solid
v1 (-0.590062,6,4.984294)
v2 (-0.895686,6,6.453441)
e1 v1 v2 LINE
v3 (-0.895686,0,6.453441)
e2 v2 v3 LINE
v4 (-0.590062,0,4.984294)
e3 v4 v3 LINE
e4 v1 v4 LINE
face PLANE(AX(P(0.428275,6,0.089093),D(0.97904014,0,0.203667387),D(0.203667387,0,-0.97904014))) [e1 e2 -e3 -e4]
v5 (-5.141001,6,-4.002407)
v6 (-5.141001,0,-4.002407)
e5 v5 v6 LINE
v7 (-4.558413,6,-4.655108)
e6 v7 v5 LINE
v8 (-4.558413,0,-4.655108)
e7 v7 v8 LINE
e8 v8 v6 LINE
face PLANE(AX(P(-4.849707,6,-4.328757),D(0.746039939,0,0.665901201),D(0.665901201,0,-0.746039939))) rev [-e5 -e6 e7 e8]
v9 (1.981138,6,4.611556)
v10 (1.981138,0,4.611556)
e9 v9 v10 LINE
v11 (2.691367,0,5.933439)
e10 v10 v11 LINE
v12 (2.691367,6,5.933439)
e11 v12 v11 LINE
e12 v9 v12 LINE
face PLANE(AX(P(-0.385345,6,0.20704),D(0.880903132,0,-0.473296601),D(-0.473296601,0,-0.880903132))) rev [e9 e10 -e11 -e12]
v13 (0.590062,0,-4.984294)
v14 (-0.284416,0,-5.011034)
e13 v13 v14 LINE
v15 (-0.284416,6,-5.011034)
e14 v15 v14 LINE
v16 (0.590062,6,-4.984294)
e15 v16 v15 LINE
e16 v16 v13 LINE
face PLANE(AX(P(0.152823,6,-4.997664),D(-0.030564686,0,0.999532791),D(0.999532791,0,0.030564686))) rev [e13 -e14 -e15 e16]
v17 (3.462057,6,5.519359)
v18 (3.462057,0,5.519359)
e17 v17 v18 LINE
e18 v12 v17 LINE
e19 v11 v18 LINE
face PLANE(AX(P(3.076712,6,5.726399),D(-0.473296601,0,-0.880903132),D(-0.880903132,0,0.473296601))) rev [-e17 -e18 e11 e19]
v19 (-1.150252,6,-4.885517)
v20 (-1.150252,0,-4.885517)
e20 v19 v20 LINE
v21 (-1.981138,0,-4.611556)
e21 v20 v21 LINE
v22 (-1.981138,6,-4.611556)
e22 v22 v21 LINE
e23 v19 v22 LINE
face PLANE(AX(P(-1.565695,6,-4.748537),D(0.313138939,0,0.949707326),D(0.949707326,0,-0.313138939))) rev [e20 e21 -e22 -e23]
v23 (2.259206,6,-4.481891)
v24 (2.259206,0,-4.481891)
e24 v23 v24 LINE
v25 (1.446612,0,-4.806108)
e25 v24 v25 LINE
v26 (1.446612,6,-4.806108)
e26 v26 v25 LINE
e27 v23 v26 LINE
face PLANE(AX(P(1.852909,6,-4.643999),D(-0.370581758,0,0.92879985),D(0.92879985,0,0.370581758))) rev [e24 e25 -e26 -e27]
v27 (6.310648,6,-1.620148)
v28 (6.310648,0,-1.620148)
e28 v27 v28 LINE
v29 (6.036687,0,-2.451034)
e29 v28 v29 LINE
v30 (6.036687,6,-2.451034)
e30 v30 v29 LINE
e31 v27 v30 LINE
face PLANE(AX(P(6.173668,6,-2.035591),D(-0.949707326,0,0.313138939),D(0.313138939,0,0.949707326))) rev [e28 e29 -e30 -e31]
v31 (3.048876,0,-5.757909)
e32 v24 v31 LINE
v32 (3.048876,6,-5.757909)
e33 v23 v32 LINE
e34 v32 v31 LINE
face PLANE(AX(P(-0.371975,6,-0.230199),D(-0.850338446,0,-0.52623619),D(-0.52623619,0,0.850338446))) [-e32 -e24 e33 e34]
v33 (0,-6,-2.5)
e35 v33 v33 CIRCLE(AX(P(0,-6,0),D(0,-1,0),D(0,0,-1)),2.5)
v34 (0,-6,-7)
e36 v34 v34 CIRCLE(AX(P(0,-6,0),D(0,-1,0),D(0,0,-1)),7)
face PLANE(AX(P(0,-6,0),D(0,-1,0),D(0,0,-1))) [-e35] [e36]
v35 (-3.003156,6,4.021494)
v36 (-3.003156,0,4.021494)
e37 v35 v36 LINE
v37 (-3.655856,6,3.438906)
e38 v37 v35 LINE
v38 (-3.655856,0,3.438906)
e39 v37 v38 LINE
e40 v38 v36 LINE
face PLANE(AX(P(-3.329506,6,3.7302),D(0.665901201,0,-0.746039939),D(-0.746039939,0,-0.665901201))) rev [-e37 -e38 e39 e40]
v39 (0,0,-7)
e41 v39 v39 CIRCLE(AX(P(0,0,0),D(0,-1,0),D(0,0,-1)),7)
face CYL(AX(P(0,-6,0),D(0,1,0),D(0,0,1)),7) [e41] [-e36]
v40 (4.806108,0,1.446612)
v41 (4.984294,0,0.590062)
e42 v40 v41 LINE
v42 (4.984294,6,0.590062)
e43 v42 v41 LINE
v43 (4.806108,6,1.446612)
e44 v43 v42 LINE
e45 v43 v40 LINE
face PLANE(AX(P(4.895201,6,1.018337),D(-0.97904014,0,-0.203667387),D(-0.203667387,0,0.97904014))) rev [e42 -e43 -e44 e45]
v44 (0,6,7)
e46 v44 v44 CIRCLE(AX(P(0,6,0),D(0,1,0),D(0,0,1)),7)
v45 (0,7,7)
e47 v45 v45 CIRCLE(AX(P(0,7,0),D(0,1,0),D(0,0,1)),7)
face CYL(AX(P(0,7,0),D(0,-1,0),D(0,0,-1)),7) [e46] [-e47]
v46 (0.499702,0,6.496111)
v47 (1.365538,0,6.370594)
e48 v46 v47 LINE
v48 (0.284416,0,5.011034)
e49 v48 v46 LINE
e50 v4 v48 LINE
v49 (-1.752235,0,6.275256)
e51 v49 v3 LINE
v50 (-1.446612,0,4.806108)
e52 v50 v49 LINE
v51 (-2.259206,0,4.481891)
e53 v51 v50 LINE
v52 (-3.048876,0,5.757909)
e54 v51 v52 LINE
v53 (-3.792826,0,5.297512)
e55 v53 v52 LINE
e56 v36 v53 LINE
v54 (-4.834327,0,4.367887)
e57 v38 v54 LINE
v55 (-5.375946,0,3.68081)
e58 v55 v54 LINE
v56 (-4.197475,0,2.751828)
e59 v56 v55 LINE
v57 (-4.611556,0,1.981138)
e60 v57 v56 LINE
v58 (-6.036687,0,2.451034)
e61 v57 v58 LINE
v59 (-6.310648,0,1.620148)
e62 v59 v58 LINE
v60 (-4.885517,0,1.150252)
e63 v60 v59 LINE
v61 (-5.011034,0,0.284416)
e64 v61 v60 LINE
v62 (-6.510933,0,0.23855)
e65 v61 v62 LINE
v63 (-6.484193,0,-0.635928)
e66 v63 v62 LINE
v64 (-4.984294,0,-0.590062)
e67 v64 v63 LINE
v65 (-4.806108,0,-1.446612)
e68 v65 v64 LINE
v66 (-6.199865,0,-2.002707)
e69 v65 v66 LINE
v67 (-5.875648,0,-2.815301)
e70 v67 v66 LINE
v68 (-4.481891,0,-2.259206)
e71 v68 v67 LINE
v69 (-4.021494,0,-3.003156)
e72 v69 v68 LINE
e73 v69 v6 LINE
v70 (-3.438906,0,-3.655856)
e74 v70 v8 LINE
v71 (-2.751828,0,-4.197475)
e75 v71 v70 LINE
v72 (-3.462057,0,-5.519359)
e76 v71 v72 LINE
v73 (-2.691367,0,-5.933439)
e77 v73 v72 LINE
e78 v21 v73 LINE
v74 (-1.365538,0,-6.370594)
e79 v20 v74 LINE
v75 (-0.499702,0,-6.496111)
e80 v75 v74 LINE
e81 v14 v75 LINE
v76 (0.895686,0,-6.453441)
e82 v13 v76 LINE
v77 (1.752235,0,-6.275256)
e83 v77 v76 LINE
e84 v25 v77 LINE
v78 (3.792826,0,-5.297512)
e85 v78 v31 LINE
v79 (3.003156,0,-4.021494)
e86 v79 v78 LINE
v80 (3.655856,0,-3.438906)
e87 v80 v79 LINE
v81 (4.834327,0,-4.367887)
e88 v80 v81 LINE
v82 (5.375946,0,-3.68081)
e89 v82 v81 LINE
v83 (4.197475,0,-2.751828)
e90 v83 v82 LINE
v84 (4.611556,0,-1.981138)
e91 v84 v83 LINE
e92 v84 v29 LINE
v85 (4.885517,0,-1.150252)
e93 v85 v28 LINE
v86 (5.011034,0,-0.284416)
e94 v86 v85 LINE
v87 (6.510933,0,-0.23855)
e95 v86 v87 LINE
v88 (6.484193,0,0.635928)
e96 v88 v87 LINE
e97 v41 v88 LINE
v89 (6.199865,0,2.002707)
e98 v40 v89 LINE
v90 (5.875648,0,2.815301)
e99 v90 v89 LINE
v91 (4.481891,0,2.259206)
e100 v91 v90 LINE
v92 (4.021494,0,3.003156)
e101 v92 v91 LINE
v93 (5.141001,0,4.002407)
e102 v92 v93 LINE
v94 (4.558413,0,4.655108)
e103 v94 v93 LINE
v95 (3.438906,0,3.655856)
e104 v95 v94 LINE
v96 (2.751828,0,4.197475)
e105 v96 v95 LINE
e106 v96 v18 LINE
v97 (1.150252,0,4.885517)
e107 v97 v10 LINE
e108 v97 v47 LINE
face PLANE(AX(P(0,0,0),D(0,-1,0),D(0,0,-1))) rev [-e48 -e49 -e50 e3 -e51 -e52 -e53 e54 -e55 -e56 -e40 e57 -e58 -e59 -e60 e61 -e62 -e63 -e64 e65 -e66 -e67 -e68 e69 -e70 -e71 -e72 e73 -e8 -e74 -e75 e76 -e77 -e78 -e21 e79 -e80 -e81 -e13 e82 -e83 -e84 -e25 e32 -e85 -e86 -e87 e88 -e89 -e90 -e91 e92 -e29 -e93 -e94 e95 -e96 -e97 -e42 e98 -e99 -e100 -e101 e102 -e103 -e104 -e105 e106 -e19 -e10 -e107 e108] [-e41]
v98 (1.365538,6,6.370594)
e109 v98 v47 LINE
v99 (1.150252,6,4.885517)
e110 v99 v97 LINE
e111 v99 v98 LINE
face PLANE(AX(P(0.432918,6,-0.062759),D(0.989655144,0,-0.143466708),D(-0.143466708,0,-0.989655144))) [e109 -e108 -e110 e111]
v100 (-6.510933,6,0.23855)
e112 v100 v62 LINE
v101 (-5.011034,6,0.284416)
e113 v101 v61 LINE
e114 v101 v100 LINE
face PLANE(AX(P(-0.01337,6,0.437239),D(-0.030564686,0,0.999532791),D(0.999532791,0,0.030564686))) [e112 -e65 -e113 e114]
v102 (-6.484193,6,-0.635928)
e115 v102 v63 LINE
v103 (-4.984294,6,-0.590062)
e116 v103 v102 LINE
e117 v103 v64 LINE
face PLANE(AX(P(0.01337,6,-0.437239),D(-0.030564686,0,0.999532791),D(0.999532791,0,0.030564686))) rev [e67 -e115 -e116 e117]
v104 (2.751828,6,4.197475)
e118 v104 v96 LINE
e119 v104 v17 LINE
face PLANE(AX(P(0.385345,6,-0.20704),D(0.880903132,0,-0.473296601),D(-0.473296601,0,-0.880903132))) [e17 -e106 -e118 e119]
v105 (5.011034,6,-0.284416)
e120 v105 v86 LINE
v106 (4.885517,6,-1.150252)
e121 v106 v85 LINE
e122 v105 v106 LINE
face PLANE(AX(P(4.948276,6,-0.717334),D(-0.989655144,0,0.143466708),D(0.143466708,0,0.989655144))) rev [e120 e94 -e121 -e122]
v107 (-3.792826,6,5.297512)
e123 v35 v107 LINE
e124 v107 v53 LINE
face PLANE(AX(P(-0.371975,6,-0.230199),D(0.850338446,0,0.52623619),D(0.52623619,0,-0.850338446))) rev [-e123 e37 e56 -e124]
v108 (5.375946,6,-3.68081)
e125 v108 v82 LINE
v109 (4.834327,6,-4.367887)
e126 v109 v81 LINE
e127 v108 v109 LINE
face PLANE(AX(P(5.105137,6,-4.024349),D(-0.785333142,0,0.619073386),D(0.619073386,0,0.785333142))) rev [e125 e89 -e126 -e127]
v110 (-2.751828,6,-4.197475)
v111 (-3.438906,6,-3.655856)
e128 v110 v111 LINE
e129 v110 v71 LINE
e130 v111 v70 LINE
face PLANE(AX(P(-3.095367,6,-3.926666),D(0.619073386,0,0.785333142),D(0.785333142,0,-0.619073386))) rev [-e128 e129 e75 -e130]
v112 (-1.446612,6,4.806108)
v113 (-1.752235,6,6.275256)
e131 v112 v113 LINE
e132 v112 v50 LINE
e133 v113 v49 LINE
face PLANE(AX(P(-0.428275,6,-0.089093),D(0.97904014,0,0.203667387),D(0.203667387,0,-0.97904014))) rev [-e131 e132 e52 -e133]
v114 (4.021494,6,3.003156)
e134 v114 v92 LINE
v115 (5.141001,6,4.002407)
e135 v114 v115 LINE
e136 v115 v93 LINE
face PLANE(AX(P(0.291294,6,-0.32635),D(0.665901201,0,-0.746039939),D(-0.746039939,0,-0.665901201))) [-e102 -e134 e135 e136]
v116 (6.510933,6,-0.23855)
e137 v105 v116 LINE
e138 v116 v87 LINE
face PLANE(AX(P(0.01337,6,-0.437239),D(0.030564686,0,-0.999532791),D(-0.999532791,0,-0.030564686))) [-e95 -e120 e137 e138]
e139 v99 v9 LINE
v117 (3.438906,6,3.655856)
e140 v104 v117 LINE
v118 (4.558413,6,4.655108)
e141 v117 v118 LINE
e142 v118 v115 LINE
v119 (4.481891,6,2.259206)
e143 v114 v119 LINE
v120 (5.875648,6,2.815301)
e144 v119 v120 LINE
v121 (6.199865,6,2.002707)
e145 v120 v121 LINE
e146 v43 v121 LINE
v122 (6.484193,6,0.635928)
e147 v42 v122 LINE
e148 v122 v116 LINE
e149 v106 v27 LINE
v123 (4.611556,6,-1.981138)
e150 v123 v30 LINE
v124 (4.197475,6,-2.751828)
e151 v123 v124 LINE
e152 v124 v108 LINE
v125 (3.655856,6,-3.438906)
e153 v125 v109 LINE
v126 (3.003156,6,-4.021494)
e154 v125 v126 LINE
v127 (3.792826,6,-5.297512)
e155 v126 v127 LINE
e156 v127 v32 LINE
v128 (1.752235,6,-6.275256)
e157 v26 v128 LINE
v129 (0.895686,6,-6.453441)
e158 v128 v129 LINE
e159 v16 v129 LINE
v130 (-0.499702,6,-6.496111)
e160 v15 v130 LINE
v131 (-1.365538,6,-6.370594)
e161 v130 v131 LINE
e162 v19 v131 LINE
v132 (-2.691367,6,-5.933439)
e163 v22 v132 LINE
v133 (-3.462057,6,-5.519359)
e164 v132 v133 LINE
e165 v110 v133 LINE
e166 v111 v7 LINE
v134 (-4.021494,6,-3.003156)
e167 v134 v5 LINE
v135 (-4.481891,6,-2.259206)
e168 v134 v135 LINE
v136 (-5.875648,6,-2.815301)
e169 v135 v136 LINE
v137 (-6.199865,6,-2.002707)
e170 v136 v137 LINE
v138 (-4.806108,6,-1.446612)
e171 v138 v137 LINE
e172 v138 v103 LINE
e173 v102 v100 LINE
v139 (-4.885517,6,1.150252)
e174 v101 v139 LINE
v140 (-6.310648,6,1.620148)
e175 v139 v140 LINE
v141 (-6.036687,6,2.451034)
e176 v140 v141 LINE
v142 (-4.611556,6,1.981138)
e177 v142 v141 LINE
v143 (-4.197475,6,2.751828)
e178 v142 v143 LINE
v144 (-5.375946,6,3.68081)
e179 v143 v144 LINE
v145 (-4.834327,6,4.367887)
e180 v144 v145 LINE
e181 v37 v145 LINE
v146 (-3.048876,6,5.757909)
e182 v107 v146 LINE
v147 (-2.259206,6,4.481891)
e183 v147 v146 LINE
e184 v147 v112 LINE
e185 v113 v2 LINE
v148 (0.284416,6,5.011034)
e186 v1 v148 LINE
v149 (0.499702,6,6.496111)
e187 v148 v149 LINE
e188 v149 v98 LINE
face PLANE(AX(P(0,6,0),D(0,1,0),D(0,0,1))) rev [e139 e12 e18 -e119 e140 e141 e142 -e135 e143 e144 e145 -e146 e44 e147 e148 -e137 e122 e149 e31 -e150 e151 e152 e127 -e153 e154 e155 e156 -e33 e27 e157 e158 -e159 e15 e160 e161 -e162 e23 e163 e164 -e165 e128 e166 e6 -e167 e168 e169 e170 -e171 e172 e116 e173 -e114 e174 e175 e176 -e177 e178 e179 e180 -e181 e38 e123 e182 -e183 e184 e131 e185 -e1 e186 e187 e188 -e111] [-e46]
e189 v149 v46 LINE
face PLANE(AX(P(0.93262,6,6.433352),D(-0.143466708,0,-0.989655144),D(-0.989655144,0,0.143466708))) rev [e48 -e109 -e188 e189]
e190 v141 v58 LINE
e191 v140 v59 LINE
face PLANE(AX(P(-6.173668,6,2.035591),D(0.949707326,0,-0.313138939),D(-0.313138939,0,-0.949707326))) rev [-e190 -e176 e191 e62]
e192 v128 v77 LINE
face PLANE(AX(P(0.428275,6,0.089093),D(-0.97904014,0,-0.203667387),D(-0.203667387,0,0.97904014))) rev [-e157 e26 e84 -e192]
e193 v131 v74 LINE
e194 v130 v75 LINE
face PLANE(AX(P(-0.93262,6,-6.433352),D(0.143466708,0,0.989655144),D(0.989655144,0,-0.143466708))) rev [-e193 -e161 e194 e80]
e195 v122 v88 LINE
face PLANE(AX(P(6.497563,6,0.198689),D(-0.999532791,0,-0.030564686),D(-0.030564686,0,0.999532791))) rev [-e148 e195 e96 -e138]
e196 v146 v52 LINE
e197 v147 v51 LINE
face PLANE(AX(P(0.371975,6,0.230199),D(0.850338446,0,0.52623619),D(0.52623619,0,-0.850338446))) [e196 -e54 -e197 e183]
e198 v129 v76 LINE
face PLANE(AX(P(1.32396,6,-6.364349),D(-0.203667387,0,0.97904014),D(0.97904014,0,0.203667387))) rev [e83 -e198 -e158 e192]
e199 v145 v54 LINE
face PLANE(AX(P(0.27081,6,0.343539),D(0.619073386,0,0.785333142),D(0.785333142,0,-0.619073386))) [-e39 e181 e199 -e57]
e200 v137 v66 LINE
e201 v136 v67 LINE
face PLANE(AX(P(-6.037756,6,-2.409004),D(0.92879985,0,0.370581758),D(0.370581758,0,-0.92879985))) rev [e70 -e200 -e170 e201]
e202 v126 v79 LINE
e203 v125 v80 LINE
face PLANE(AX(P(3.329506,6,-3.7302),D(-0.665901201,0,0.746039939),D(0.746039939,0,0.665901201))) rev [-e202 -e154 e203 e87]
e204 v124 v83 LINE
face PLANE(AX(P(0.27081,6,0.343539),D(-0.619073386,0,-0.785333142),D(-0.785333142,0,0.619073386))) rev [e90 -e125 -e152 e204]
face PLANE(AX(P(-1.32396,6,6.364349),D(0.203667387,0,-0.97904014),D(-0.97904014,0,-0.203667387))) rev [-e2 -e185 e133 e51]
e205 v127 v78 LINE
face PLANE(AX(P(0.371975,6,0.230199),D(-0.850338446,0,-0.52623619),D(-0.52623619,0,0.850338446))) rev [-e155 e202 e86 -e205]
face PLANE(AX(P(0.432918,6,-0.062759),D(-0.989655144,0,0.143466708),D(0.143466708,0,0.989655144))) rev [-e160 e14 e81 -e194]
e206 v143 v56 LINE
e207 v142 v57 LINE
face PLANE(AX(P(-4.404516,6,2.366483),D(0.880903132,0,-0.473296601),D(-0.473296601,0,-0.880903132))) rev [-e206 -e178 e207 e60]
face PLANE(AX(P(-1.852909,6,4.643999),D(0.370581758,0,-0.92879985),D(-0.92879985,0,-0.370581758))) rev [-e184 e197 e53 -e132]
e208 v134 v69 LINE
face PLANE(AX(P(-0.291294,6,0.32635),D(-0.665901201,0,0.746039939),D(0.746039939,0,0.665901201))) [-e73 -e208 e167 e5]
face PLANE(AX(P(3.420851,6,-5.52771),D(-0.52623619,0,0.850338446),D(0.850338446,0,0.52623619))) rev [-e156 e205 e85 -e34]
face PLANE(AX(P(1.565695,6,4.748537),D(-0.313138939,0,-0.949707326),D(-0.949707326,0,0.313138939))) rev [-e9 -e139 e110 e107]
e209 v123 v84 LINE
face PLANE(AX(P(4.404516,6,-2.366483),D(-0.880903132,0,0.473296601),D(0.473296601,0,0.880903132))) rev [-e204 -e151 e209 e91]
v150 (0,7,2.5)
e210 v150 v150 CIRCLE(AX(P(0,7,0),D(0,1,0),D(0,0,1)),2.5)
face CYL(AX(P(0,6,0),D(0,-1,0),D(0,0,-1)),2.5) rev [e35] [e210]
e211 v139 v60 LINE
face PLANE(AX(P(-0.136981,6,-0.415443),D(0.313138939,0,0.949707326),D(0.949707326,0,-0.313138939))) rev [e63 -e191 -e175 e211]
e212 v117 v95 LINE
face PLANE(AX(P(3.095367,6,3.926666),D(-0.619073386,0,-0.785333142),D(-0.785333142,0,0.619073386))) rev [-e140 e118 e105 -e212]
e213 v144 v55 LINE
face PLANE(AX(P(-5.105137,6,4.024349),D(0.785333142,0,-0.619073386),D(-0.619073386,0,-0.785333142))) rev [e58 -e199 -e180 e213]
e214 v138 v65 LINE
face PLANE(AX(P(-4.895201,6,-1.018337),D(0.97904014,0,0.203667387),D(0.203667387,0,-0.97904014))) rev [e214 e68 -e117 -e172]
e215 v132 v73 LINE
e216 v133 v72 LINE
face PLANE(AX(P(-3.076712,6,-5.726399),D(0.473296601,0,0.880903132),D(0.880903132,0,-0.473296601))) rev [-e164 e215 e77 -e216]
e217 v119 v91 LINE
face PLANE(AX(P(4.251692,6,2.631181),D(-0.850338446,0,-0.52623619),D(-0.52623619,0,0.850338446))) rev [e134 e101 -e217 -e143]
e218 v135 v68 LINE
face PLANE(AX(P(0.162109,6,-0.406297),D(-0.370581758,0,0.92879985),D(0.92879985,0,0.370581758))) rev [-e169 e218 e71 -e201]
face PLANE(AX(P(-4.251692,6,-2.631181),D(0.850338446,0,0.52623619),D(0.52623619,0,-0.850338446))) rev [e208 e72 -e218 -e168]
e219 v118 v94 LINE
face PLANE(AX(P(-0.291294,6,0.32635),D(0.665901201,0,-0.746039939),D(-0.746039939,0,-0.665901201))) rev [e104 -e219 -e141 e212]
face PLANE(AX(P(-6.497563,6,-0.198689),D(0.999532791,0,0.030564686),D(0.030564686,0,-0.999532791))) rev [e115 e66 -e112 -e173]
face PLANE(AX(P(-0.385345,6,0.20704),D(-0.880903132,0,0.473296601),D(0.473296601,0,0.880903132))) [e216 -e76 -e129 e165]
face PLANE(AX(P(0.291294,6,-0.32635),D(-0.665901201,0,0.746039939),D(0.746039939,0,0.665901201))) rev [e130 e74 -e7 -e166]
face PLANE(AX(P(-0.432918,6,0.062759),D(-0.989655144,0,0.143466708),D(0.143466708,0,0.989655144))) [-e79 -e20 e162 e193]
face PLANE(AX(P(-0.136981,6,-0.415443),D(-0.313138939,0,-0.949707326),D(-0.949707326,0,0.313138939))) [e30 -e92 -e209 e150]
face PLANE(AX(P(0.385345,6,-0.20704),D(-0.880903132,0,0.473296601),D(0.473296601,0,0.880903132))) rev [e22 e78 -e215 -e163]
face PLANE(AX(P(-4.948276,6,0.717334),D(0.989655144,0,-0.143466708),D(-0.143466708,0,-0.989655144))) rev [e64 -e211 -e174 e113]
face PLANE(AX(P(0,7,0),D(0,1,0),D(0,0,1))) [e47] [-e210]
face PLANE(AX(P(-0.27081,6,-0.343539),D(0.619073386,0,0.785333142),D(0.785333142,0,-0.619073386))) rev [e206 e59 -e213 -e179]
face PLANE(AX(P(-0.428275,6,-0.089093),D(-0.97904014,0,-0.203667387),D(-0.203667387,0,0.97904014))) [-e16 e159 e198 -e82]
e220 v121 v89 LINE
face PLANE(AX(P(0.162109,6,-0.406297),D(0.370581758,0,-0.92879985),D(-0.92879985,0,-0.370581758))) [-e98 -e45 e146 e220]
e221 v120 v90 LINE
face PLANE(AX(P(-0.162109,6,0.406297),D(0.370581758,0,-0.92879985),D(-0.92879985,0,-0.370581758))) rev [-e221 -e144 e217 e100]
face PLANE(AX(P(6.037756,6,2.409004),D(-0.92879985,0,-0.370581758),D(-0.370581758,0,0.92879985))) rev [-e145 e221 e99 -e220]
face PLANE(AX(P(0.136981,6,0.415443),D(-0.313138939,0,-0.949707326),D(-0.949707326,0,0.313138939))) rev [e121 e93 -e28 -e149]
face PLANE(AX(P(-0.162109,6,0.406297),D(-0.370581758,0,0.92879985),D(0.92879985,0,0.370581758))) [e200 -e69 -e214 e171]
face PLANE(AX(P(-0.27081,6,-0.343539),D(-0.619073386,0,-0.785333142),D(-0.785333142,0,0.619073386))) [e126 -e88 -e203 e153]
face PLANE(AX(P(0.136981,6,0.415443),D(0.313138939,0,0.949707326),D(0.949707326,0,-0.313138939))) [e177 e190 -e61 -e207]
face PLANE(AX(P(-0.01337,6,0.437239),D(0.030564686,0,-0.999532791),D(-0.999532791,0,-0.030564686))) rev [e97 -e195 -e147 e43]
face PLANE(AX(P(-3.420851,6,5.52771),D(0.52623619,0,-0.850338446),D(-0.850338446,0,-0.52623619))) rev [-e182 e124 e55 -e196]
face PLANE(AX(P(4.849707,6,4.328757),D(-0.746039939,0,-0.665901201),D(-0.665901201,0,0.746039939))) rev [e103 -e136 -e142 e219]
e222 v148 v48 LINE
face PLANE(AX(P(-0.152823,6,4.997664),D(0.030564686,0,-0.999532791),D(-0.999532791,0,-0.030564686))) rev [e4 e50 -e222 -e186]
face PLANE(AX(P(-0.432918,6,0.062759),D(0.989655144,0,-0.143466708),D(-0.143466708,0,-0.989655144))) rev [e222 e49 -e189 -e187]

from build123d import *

# Parameters (mm, degrees)
ESTRUSIONE_ESTRUSIONE1_OUTLINE_R = 2.5
ESTRUSIONE_ESTRUSIONE1_DEPTH     = 6
SCHIZZO2_R                       = 7
ESTRUSIONE_ESTRUSIONE2_DEPTH     = 1
FORI_FILETTATI_5_0MM1_D          = 5
ESTRUSIONE_ESTRUSIONE3_START     = 6
SCHIZZO4_R                       = 7
ESTRUSIONE_ESTRUSIONE3_DEPTH     = 6
FORI_FILETTATI_5_0MM2_D          = 5
FORI_FILETTATI_5_0MM2_DEPTH      = 10
FORI_FILETTATI_5_0MM2_TIP        = 1.502151548


# Read off the part's stored shape, not the designer's step: Estrusione-Estrusione1
with BuildPart() as part:
    # Estrusione-Estrusione1 outline → Estrusione-Estrusione1 (new body)
    with BuildSketch(Plane(origin=(0, 0, 0), x_dir=(1, 0, 0), z_dir=(0, 1, 0))):
        Polygon((-4.558413324, 4.655107649), (-5.141001385, 4.002407278), (-4.021493725, 3.00315582), (-4.481890734, 2.259206078), (-5.875647949, 2.815301129), (-6.199864976, 2.002706553), (-4.806107761, 1.446611503), (-4.984293637, 0.590062369), (-6.484192715, 0.635927742), (-6.51093335, -0.238550138), (-5.011034272, -0.284415511), (-4.885517166, -1.15025157), (-6.310648144, -1.620147915), (-6.036687071, -2.451034162), (-4.611556094, -1.981137817), (-4.197475223, -2.751828193), (-5.375946271, -3.680809823), (-4.83432724, -4.367887293), (-3.655856192, -3.438905663), (-3.00315582, -4.021493725), (-3.792825937, -5.297511743), (-3.048876196, -5.757908753), (-2.259206078, -4.481890734), (-1.446611503, -4.806107761), (-1.75223482, -6.275255564), (-0.895685686, -6.45344144), (-0.590062369, -4.984293637), (0.284415511, -5.011034272), (0.499701678, -6.496110952), (1.365537736, -6.370593846), (1.15025157, -4.885517166), (1.981137817, -4.611556094), (2.691366778, -5.933439486), (3.462057155, -5.519358615), (2.751828193, -4.197475223), (3.438905663, -3.655856192), (4.558413324, -4.655107649), (5.141001385, -4.002407278), (4.021493725, -3.00315582), (4.481890734, -2.259206078), (5.875647949, -2.815301129), (6.199864976, -2.002706553), (4.806107761, -1.446611503), (4.984293637, -0.590062369), (6.484192715, -0.635927742), (6.51093335, 0.238550138), (5.011034272, 0.284415511), (4.885517166, 1.15025157), (6.310648144, 1.620147915), (6.036687071, 2.451034162), (4.611556094, 1.981137817), (4.197475223, 2.751828193), (5.375946271, 3.680809823), (4.83432724, 4.367887293), (3.655856192, 3.438905663), (3.00315582, 4.021493725), (3.792825937, 5.297511743), (3.048876196, 5.757908753), (2.259206078, 4.481890734), (1.446611503, 4.806107761), (1.75223482, 6.275255564), (0.895685686, 6.45344144), (0.590062369, 4.984293637), (-0.284415511, 5.011034272), (-0.499701678, 6.496110952), (-1.365537736, 6.370593846), (-1.15025157, 4.885517166), (-1.981137817, 4.611556094), (-2.691366778, 5.933439486), (-3.462057155, 5.519358615), (-2.751828193, 4.197475223), (-3.438905663, 3.655856192), align=None)
        Circle(ESTRUSIONE_ESTRUSIONE1_OUTLINE_R, mode=Mode.SUBTRACT)
    extrude(amount=ESTRUSIONE_ESTRUSIONE1_DEPTH)

    # Schizzo2 → Estrusione-Estrusione2 (add)
    with BuildSketch(Plane(origin=(0, 6, 0), x_dir=(1, 0, 0), z_dir=(0, 1, 0))):
        with Locations(Location((0, 0, 0), (0, 0, 270))):
            Circle(SCHIZZO2_R)
    extrude(amount=ESTRUSIONE_ESTRUSIONE2_DEPTH)

    # Fori filettati Ø5.0mm1 (through all)
    with Locations(Plane.ZX.offset(7)):
        with Locations((0, 0)):
            Hole(FORI_FILETTATI_5_0MM1_D / 2)

    # Schizzo4 → Estrusione-Estrusione3 (add)
    with BuildSketch(Plane.XZ.offset(ESTRUSIONE_ESTRUSIONE3_START)):
        with Locations(Location((0, 0, 0), (0, 0, 90))):
            Circle(SCHIZZO4_R)
    extrude(amount=-ESTRUSIONE_ESTRUSIONE3_DEPTH)

    # Fori filettati Ø5.0mm2
    with Locations(Plane(origin=(0, -6, 0), x_dir=(0, 0, -1), z_dir=(0, -1, 0))):
        with Locations((0, 0)):
            Hole(FORI_FILETTATI_5_0MM2_D / 2, depth=FORI_FILETTATI_5_0MM2_DEPTH)
            with Locations((0, 0, -(FORI_FILETTATI_5_0MM2_DEPTH + FORI_FILETTATI_5_0MM2_TIP / 2))):  # 118° drill point
                Cone(0, FORI_FILETTATI_5_0MM2_D / 2, FORI_FILETTATI_5_0MM2_TIP, mode=Mode.SUBTRACT)


solid = part.part
